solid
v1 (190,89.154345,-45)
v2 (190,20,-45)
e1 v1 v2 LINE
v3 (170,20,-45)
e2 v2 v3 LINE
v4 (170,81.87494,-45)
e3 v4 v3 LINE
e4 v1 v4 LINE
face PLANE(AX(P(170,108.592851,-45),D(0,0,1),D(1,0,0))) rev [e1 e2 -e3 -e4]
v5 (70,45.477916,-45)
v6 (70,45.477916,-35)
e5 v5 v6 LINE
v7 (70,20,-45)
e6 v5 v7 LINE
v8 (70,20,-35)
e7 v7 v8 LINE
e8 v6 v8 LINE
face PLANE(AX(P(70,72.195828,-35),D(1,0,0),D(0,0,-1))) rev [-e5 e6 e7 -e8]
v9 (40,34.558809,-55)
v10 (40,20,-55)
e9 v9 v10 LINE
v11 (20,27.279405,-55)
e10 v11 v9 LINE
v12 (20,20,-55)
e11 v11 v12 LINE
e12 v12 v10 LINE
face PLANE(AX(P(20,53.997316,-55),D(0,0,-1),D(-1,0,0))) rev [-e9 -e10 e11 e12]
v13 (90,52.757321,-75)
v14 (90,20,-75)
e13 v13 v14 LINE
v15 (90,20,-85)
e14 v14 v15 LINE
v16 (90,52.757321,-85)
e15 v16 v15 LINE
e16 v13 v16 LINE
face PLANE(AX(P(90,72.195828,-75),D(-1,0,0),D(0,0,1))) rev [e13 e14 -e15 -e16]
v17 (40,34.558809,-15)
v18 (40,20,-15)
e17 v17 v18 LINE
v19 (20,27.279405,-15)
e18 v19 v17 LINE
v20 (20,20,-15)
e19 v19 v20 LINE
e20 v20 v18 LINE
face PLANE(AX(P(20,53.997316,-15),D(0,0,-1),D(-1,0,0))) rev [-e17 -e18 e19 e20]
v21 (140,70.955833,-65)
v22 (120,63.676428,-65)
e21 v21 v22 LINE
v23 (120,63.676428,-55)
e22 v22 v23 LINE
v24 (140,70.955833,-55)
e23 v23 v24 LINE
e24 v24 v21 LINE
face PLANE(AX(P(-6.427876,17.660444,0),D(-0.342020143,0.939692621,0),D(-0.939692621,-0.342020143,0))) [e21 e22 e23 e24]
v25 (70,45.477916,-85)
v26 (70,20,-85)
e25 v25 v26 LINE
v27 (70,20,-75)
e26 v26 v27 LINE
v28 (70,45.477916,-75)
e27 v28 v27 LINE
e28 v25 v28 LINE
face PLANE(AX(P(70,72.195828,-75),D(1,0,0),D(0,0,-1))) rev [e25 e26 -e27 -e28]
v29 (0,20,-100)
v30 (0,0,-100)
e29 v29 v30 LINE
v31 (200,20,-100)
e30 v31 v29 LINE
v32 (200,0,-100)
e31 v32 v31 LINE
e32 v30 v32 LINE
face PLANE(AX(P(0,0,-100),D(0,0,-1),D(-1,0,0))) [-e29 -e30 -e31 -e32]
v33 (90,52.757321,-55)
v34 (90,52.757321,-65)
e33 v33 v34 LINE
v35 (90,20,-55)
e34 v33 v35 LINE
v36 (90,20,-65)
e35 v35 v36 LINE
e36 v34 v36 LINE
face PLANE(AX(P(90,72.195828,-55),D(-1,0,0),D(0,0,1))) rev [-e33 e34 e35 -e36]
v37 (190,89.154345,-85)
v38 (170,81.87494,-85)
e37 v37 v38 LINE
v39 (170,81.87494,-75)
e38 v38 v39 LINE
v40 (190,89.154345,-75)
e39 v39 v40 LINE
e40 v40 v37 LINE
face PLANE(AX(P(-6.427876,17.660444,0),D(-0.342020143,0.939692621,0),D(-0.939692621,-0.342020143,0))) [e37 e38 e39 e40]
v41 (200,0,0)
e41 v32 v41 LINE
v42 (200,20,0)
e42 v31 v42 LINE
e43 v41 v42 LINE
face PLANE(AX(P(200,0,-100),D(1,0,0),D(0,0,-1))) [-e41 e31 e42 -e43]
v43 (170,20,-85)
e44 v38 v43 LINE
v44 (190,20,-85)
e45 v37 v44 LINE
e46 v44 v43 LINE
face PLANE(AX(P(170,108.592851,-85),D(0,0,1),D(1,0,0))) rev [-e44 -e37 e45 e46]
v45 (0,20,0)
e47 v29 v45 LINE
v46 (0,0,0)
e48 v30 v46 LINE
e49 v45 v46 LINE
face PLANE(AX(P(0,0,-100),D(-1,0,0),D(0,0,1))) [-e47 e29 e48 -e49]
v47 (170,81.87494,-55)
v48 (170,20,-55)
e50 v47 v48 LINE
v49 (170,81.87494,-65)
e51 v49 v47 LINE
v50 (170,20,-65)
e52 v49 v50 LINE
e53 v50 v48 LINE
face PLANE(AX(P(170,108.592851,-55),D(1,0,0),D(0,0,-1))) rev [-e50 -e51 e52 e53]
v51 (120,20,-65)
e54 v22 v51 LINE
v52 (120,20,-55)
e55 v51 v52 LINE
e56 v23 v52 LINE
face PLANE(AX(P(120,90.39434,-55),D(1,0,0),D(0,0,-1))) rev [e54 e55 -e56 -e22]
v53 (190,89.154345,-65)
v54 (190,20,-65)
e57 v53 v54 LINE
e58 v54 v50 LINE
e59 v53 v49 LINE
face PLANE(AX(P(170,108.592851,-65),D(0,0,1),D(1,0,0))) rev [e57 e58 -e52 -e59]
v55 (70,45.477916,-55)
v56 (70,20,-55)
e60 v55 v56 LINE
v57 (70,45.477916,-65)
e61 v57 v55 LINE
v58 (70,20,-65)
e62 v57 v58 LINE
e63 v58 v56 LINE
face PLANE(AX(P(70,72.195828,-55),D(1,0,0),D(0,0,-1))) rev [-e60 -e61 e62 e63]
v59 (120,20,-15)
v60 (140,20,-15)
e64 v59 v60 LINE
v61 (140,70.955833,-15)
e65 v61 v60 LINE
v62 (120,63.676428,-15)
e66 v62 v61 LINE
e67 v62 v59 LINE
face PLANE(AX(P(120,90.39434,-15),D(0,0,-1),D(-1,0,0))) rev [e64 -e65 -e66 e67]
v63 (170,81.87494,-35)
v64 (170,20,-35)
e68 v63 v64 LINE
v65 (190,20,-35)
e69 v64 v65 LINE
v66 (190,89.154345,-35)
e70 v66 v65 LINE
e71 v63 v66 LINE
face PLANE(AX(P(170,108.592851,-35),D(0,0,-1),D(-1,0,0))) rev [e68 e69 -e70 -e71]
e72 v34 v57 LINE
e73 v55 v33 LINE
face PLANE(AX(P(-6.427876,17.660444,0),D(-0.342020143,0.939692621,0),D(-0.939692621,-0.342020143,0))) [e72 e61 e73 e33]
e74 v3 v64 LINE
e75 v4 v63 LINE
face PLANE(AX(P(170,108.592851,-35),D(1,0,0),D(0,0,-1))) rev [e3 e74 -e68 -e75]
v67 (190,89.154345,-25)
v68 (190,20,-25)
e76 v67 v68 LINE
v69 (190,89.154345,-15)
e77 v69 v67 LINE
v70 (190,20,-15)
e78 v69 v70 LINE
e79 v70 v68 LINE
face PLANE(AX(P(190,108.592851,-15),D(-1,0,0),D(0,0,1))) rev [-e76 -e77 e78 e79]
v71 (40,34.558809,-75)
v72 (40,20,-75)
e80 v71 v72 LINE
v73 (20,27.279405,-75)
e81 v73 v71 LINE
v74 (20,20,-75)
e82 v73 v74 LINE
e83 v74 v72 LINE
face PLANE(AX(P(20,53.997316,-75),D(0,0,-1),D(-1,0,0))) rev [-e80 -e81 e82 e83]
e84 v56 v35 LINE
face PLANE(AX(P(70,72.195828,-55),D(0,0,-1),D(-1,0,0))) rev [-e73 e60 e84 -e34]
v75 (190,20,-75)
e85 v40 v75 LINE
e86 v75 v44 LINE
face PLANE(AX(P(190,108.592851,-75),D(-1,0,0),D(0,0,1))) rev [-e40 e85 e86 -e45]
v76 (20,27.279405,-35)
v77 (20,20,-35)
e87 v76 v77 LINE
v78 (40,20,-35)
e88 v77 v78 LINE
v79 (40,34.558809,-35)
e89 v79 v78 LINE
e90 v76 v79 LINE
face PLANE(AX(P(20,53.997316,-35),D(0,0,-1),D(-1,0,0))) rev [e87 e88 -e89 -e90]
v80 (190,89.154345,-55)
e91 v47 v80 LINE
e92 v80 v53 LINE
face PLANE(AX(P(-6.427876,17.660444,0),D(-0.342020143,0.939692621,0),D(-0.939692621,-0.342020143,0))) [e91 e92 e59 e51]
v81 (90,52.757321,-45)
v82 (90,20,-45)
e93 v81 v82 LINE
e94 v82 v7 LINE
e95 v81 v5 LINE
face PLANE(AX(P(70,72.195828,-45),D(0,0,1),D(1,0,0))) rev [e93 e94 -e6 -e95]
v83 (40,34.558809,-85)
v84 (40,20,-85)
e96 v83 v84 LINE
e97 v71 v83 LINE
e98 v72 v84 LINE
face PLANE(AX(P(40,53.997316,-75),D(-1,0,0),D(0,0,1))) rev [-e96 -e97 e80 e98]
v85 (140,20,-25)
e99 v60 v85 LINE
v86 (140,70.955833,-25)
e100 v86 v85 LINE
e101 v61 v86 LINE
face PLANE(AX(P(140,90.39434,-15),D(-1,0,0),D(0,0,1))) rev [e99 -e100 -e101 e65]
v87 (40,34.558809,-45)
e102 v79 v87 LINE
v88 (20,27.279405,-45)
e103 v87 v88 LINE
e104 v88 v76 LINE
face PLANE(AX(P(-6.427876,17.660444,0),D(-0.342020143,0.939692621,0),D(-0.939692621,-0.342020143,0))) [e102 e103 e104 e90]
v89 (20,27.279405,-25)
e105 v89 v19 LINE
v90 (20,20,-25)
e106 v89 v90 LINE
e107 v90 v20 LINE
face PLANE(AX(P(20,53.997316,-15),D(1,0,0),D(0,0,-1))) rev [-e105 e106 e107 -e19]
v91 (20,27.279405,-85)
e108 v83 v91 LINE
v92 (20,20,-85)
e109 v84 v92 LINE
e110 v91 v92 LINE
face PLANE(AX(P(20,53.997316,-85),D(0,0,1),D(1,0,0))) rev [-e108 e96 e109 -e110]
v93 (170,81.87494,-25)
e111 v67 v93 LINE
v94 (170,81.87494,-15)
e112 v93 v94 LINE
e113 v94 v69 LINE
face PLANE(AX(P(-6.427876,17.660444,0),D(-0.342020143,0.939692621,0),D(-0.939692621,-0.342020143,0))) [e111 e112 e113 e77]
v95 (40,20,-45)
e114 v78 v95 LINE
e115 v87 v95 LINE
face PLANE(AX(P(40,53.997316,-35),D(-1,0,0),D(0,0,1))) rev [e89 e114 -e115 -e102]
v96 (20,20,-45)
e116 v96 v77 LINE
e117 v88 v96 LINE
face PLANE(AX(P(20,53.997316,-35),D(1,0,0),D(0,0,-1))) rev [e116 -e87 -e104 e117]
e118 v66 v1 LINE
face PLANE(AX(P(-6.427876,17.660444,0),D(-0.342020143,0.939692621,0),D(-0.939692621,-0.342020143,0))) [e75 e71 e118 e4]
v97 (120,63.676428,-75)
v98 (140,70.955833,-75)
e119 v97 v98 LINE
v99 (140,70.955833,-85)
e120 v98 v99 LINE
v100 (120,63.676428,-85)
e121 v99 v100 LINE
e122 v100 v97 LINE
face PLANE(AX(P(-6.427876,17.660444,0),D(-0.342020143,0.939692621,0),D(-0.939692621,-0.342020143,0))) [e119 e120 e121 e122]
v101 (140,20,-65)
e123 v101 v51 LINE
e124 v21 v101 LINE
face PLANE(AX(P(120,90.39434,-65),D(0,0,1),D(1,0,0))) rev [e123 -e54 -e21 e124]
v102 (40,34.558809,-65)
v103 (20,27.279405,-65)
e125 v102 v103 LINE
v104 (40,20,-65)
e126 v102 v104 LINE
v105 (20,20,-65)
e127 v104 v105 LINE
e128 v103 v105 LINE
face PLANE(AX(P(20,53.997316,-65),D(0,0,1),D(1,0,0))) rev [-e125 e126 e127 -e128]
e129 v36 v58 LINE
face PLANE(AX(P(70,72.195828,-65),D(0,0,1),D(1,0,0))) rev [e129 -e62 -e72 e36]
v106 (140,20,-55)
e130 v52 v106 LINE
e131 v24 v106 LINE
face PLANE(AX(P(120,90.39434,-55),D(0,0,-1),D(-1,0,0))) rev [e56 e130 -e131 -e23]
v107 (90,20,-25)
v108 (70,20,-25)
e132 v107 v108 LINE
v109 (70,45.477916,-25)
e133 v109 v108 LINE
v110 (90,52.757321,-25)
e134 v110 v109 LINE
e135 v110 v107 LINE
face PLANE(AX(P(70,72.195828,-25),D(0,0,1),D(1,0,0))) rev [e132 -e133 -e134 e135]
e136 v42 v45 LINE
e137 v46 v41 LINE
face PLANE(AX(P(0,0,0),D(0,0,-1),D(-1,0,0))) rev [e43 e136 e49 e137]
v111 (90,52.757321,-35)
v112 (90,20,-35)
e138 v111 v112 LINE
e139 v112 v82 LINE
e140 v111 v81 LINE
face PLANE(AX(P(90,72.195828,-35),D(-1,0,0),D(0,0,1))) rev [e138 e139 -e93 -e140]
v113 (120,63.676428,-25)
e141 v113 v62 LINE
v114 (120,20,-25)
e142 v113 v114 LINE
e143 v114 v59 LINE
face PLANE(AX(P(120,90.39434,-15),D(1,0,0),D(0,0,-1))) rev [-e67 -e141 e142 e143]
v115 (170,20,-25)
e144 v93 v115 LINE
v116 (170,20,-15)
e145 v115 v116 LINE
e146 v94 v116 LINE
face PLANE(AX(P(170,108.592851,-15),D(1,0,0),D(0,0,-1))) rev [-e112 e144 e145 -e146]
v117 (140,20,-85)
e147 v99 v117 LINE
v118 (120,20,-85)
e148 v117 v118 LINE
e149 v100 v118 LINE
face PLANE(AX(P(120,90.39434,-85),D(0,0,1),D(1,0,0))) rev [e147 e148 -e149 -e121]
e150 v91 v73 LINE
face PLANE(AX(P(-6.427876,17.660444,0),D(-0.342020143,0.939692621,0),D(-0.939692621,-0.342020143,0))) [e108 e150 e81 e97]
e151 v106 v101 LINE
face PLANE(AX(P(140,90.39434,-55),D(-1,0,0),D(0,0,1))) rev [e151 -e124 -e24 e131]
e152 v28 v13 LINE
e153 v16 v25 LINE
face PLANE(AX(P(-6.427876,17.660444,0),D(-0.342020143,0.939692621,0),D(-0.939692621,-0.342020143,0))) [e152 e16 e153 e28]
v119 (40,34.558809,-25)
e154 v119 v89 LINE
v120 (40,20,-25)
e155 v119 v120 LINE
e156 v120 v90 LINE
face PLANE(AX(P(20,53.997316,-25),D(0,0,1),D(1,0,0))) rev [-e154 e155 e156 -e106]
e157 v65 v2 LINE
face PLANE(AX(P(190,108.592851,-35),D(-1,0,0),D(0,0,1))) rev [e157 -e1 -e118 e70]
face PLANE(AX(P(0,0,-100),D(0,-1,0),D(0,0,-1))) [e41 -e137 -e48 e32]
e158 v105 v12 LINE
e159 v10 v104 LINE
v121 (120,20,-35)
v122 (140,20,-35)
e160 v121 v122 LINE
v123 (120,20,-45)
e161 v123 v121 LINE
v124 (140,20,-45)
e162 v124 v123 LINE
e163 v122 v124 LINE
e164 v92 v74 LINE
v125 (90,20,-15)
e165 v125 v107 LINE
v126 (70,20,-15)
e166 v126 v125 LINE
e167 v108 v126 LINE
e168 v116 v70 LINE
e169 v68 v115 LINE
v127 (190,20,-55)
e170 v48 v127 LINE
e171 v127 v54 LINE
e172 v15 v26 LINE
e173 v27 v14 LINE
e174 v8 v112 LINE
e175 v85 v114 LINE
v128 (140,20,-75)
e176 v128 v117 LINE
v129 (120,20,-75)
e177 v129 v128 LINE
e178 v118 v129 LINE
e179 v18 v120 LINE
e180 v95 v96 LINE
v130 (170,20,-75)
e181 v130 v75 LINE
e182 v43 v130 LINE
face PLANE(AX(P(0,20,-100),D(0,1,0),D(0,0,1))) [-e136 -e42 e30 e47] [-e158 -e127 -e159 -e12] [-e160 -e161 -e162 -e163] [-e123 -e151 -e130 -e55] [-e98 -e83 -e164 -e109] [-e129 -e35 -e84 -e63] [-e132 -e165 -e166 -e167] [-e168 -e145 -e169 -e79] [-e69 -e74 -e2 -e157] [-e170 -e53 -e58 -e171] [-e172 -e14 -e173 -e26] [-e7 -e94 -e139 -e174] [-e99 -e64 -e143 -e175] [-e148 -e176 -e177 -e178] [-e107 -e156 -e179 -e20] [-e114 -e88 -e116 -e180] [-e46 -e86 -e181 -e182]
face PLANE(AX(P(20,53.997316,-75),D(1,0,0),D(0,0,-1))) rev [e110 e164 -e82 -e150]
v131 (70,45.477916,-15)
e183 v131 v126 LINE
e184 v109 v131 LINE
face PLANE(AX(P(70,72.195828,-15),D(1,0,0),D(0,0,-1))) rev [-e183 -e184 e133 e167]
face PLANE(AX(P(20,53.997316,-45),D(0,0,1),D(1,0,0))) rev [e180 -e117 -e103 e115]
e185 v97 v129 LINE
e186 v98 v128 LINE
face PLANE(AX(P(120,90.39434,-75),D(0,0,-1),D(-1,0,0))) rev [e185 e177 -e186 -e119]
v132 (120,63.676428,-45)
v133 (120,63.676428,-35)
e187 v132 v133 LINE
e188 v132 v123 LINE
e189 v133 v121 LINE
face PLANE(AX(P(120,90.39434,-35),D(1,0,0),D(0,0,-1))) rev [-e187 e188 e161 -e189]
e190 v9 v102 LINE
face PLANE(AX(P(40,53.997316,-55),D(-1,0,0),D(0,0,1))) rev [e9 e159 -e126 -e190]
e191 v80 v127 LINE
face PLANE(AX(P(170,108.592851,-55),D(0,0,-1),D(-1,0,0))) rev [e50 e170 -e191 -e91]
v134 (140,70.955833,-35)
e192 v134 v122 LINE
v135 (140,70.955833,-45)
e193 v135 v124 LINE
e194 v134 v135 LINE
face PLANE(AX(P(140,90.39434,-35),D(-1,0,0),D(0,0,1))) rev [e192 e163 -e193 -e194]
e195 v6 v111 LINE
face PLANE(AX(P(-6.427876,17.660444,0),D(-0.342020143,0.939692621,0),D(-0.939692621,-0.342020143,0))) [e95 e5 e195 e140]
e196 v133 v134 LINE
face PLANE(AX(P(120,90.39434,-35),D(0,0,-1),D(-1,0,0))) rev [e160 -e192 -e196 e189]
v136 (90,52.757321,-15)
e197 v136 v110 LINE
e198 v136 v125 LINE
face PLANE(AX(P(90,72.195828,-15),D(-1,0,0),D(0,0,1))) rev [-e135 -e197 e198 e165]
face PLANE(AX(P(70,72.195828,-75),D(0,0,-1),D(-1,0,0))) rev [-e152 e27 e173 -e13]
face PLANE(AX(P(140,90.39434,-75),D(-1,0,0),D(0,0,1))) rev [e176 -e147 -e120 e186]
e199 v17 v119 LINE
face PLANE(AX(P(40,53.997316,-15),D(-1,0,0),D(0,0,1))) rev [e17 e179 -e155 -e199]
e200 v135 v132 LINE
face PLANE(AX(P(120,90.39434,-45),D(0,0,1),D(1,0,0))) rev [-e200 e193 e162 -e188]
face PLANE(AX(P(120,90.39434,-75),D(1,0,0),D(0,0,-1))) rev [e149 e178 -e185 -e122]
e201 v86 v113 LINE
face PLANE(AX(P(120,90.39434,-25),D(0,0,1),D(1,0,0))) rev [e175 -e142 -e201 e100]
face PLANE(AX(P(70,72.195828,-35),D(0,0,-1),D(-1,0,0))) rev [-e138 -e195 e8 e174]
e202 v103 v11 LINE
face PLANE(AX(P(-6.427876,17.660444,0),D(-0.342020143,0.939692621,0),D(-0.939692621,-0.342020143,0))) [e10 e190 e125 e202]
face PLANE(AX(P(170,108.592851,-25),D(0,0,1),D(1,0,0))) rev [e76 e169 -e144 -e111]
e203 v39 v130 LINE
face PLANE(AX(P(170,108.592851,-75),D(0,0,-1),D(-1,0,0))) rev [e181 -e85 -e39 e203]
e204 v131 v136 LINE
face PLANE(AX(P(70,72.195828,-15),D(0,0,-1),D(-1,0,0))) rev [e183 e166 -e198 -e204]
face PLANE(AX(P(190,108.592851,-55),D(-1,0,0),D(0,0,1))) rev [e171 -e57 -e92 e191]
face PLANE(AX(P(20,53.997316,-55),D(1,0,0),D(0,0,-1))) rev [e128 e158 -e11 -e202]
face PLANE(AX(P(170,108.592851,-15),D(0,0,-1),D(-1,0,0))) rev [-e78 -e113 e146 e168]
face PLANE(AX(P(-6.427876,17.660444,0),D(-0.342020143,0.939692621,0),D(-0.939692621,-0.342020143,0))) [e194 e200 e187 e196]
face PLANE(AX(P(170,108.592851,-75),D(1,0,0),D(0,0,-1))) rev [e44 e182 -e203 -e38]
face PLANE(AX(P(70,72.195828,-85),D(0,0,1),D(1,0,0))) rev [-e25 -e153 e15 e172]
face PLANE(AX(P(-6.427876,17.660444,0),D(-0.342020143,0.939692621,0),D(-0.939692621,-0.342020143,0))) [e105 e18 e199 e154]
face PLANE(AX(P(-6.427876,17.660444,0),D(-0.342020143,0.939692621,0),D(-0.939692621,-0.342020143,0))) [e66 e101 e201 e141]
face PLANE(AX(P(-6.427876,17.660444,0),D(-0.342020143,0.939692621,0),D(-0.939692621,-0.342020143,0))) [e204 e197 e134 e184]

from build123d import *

# Parameters (mm, degrees)
SKETCH_1_W               = 200
SKETCH_1_H               = 20
EXTRUDE_2_DEPTH          = 100
EXTRUDE_3_REACH          = 226.499
SKETCH_3_W               = 20
SKETCH_3_H               = 10
PATTERN_START            = -85
PATTERN_LINEAR_1_DEPTH   = 10
PATTERN_START_2          = -65
PATTERN_LINEAR_1_2_DEPTH = 10
PATTERN_START_3          = -45
PATTERN_LINEAR_1_3_DEPTH = 10
PATTERN_START_4          = -25
PATTERN_LINEAR_1_4_DEPTH = 10


# Read off the part's stored shape, not the designer's step: Линейный массив1
with BuildPart() as part:
    # Эскиз1 → Бобышка-Вытянуть2 (new body)
    with BuildSketch(Plane.XY):
        with Locations((100, 10)):
            Rectangle(SKETCH_1_W, SKETCH_1_H)
    extrude(amount=-EXTRUDE_2_DEPTH)

    # Бобышка-Вытянуть3: up to this plane
    extrude_3_end = Plane(origin=(-6.427876097, 17.660444431, 0), z_dir=(-0.34202014332566943, 0.9396926207859081, 0))
    # Эскиз3 → Бобышка-Вытянуть3 (add, up to the surface)
    with BuildSketch(Plane(origin=(0, 20, 0), x_dir=(1, 0, 0), z_dir=(0, 1, 0)), mode=Mode.PRIVATE) as extrude_3_sk1:
        with Locations((30, 20)):
            Rectangle(SKETCH_3_W, SKETCH_3_H)
    extrude_3_tool1 = split(extrude(extrude_3_sk1.sketch, amount=EXTRUDE_3_REACH, mode=Mode.PRIVATE), bisect_by=extrude_3_end, keep=Keep.BOTH, mode=Mode.PRIVATE)
    add(extrude_3_tool1.solids().sort_by_distance((30, 20, -20))[0])

    # Линейный массив1 outline → Линейный массив1 (add)
    with BuildSketch(Plane.XY.offset(PATTERN_START)):
        Polygon((170, 81.874939825), (170, 20), (190, 20), (190, 89.154344511), align=None)
        Polygon((120, 63.676428112), (120, 20), (140, 20), (140, 70.955832797), align=None)
        Polygon((70, 45.477916399), (70, 20), (90, 20), (90, 52.757321084), align=None)
        Polygon((20, 27.279404685), (20, 20), (40, 20), (40, 34.558809371), align=None)
    extrude(amount=PATTERN_LINEAR_1_DEPTH)

    # Pattern Linear 1 2 outline → Pattern Linear 1 2 (add)
    with BuildSketch(Plane.XY.offset(PATTERN_START_2)):
        Polygon((170, 81.874939825), (170, 20), (190, 20), (190, 89.154344511), align=None)
        Polygon((120, 63.676428112), (120, 20), (140, 20), (140, 70.955832797), align=None)
        Polygon((70, 45.477916399), (70, 20), (90, 20), (90, 52.757321084), align=None)
        Polygon((20, 27.279404685), (20, 20), (40, 20), (40, 34.558809371), align=None)
    extrude(amount=PATTERN_LINEAR_1_2_DEPTH)

    # Pattern Linear 1 3 outline → Pattern Linear 1 3 (add)
    with BuildSketch(Plane.XY.offset(PATTERN_START_3)):
        Polygon((170, 81.874939825), (170, 20), (190, 20), (190, 89.154344511), align=None)
        Polygon((120, 63.676428112), (120, 20), (140, 20), (140, 70.955832797), align=None)
        Polygon((70, 45.477916399), (70, 20), (90, 20), (90, 52.757321084), align=None)
        Polygon((20, 27.279404685), (20, 20), (40, 20), (40, 34.558809371), align=None)
    extrude(amount=PATTERN_LINEAR_1_3_DEPTH)

    # Pattern Linear 1 4 outline → Pattern Linear 1 4 (add)
    with BuildSketch(Plane.XY.offset(PATTERN_START_4)):
        Polygon((170, 81.874939825), (170, 20), (190, 20), (190, 89.154344511), align=None)
        Polygon((120, 63.676428112), (120, 20), (140, 20), (140, 70.955832797), align=None)
        Polygon((70, 45.477916399), (70, 20), (90, 20), (90, 52.757321084), align=None)
    extrude(amount=PATTERN_LINEAR_1_4_DEPTH)


solid = part.part
